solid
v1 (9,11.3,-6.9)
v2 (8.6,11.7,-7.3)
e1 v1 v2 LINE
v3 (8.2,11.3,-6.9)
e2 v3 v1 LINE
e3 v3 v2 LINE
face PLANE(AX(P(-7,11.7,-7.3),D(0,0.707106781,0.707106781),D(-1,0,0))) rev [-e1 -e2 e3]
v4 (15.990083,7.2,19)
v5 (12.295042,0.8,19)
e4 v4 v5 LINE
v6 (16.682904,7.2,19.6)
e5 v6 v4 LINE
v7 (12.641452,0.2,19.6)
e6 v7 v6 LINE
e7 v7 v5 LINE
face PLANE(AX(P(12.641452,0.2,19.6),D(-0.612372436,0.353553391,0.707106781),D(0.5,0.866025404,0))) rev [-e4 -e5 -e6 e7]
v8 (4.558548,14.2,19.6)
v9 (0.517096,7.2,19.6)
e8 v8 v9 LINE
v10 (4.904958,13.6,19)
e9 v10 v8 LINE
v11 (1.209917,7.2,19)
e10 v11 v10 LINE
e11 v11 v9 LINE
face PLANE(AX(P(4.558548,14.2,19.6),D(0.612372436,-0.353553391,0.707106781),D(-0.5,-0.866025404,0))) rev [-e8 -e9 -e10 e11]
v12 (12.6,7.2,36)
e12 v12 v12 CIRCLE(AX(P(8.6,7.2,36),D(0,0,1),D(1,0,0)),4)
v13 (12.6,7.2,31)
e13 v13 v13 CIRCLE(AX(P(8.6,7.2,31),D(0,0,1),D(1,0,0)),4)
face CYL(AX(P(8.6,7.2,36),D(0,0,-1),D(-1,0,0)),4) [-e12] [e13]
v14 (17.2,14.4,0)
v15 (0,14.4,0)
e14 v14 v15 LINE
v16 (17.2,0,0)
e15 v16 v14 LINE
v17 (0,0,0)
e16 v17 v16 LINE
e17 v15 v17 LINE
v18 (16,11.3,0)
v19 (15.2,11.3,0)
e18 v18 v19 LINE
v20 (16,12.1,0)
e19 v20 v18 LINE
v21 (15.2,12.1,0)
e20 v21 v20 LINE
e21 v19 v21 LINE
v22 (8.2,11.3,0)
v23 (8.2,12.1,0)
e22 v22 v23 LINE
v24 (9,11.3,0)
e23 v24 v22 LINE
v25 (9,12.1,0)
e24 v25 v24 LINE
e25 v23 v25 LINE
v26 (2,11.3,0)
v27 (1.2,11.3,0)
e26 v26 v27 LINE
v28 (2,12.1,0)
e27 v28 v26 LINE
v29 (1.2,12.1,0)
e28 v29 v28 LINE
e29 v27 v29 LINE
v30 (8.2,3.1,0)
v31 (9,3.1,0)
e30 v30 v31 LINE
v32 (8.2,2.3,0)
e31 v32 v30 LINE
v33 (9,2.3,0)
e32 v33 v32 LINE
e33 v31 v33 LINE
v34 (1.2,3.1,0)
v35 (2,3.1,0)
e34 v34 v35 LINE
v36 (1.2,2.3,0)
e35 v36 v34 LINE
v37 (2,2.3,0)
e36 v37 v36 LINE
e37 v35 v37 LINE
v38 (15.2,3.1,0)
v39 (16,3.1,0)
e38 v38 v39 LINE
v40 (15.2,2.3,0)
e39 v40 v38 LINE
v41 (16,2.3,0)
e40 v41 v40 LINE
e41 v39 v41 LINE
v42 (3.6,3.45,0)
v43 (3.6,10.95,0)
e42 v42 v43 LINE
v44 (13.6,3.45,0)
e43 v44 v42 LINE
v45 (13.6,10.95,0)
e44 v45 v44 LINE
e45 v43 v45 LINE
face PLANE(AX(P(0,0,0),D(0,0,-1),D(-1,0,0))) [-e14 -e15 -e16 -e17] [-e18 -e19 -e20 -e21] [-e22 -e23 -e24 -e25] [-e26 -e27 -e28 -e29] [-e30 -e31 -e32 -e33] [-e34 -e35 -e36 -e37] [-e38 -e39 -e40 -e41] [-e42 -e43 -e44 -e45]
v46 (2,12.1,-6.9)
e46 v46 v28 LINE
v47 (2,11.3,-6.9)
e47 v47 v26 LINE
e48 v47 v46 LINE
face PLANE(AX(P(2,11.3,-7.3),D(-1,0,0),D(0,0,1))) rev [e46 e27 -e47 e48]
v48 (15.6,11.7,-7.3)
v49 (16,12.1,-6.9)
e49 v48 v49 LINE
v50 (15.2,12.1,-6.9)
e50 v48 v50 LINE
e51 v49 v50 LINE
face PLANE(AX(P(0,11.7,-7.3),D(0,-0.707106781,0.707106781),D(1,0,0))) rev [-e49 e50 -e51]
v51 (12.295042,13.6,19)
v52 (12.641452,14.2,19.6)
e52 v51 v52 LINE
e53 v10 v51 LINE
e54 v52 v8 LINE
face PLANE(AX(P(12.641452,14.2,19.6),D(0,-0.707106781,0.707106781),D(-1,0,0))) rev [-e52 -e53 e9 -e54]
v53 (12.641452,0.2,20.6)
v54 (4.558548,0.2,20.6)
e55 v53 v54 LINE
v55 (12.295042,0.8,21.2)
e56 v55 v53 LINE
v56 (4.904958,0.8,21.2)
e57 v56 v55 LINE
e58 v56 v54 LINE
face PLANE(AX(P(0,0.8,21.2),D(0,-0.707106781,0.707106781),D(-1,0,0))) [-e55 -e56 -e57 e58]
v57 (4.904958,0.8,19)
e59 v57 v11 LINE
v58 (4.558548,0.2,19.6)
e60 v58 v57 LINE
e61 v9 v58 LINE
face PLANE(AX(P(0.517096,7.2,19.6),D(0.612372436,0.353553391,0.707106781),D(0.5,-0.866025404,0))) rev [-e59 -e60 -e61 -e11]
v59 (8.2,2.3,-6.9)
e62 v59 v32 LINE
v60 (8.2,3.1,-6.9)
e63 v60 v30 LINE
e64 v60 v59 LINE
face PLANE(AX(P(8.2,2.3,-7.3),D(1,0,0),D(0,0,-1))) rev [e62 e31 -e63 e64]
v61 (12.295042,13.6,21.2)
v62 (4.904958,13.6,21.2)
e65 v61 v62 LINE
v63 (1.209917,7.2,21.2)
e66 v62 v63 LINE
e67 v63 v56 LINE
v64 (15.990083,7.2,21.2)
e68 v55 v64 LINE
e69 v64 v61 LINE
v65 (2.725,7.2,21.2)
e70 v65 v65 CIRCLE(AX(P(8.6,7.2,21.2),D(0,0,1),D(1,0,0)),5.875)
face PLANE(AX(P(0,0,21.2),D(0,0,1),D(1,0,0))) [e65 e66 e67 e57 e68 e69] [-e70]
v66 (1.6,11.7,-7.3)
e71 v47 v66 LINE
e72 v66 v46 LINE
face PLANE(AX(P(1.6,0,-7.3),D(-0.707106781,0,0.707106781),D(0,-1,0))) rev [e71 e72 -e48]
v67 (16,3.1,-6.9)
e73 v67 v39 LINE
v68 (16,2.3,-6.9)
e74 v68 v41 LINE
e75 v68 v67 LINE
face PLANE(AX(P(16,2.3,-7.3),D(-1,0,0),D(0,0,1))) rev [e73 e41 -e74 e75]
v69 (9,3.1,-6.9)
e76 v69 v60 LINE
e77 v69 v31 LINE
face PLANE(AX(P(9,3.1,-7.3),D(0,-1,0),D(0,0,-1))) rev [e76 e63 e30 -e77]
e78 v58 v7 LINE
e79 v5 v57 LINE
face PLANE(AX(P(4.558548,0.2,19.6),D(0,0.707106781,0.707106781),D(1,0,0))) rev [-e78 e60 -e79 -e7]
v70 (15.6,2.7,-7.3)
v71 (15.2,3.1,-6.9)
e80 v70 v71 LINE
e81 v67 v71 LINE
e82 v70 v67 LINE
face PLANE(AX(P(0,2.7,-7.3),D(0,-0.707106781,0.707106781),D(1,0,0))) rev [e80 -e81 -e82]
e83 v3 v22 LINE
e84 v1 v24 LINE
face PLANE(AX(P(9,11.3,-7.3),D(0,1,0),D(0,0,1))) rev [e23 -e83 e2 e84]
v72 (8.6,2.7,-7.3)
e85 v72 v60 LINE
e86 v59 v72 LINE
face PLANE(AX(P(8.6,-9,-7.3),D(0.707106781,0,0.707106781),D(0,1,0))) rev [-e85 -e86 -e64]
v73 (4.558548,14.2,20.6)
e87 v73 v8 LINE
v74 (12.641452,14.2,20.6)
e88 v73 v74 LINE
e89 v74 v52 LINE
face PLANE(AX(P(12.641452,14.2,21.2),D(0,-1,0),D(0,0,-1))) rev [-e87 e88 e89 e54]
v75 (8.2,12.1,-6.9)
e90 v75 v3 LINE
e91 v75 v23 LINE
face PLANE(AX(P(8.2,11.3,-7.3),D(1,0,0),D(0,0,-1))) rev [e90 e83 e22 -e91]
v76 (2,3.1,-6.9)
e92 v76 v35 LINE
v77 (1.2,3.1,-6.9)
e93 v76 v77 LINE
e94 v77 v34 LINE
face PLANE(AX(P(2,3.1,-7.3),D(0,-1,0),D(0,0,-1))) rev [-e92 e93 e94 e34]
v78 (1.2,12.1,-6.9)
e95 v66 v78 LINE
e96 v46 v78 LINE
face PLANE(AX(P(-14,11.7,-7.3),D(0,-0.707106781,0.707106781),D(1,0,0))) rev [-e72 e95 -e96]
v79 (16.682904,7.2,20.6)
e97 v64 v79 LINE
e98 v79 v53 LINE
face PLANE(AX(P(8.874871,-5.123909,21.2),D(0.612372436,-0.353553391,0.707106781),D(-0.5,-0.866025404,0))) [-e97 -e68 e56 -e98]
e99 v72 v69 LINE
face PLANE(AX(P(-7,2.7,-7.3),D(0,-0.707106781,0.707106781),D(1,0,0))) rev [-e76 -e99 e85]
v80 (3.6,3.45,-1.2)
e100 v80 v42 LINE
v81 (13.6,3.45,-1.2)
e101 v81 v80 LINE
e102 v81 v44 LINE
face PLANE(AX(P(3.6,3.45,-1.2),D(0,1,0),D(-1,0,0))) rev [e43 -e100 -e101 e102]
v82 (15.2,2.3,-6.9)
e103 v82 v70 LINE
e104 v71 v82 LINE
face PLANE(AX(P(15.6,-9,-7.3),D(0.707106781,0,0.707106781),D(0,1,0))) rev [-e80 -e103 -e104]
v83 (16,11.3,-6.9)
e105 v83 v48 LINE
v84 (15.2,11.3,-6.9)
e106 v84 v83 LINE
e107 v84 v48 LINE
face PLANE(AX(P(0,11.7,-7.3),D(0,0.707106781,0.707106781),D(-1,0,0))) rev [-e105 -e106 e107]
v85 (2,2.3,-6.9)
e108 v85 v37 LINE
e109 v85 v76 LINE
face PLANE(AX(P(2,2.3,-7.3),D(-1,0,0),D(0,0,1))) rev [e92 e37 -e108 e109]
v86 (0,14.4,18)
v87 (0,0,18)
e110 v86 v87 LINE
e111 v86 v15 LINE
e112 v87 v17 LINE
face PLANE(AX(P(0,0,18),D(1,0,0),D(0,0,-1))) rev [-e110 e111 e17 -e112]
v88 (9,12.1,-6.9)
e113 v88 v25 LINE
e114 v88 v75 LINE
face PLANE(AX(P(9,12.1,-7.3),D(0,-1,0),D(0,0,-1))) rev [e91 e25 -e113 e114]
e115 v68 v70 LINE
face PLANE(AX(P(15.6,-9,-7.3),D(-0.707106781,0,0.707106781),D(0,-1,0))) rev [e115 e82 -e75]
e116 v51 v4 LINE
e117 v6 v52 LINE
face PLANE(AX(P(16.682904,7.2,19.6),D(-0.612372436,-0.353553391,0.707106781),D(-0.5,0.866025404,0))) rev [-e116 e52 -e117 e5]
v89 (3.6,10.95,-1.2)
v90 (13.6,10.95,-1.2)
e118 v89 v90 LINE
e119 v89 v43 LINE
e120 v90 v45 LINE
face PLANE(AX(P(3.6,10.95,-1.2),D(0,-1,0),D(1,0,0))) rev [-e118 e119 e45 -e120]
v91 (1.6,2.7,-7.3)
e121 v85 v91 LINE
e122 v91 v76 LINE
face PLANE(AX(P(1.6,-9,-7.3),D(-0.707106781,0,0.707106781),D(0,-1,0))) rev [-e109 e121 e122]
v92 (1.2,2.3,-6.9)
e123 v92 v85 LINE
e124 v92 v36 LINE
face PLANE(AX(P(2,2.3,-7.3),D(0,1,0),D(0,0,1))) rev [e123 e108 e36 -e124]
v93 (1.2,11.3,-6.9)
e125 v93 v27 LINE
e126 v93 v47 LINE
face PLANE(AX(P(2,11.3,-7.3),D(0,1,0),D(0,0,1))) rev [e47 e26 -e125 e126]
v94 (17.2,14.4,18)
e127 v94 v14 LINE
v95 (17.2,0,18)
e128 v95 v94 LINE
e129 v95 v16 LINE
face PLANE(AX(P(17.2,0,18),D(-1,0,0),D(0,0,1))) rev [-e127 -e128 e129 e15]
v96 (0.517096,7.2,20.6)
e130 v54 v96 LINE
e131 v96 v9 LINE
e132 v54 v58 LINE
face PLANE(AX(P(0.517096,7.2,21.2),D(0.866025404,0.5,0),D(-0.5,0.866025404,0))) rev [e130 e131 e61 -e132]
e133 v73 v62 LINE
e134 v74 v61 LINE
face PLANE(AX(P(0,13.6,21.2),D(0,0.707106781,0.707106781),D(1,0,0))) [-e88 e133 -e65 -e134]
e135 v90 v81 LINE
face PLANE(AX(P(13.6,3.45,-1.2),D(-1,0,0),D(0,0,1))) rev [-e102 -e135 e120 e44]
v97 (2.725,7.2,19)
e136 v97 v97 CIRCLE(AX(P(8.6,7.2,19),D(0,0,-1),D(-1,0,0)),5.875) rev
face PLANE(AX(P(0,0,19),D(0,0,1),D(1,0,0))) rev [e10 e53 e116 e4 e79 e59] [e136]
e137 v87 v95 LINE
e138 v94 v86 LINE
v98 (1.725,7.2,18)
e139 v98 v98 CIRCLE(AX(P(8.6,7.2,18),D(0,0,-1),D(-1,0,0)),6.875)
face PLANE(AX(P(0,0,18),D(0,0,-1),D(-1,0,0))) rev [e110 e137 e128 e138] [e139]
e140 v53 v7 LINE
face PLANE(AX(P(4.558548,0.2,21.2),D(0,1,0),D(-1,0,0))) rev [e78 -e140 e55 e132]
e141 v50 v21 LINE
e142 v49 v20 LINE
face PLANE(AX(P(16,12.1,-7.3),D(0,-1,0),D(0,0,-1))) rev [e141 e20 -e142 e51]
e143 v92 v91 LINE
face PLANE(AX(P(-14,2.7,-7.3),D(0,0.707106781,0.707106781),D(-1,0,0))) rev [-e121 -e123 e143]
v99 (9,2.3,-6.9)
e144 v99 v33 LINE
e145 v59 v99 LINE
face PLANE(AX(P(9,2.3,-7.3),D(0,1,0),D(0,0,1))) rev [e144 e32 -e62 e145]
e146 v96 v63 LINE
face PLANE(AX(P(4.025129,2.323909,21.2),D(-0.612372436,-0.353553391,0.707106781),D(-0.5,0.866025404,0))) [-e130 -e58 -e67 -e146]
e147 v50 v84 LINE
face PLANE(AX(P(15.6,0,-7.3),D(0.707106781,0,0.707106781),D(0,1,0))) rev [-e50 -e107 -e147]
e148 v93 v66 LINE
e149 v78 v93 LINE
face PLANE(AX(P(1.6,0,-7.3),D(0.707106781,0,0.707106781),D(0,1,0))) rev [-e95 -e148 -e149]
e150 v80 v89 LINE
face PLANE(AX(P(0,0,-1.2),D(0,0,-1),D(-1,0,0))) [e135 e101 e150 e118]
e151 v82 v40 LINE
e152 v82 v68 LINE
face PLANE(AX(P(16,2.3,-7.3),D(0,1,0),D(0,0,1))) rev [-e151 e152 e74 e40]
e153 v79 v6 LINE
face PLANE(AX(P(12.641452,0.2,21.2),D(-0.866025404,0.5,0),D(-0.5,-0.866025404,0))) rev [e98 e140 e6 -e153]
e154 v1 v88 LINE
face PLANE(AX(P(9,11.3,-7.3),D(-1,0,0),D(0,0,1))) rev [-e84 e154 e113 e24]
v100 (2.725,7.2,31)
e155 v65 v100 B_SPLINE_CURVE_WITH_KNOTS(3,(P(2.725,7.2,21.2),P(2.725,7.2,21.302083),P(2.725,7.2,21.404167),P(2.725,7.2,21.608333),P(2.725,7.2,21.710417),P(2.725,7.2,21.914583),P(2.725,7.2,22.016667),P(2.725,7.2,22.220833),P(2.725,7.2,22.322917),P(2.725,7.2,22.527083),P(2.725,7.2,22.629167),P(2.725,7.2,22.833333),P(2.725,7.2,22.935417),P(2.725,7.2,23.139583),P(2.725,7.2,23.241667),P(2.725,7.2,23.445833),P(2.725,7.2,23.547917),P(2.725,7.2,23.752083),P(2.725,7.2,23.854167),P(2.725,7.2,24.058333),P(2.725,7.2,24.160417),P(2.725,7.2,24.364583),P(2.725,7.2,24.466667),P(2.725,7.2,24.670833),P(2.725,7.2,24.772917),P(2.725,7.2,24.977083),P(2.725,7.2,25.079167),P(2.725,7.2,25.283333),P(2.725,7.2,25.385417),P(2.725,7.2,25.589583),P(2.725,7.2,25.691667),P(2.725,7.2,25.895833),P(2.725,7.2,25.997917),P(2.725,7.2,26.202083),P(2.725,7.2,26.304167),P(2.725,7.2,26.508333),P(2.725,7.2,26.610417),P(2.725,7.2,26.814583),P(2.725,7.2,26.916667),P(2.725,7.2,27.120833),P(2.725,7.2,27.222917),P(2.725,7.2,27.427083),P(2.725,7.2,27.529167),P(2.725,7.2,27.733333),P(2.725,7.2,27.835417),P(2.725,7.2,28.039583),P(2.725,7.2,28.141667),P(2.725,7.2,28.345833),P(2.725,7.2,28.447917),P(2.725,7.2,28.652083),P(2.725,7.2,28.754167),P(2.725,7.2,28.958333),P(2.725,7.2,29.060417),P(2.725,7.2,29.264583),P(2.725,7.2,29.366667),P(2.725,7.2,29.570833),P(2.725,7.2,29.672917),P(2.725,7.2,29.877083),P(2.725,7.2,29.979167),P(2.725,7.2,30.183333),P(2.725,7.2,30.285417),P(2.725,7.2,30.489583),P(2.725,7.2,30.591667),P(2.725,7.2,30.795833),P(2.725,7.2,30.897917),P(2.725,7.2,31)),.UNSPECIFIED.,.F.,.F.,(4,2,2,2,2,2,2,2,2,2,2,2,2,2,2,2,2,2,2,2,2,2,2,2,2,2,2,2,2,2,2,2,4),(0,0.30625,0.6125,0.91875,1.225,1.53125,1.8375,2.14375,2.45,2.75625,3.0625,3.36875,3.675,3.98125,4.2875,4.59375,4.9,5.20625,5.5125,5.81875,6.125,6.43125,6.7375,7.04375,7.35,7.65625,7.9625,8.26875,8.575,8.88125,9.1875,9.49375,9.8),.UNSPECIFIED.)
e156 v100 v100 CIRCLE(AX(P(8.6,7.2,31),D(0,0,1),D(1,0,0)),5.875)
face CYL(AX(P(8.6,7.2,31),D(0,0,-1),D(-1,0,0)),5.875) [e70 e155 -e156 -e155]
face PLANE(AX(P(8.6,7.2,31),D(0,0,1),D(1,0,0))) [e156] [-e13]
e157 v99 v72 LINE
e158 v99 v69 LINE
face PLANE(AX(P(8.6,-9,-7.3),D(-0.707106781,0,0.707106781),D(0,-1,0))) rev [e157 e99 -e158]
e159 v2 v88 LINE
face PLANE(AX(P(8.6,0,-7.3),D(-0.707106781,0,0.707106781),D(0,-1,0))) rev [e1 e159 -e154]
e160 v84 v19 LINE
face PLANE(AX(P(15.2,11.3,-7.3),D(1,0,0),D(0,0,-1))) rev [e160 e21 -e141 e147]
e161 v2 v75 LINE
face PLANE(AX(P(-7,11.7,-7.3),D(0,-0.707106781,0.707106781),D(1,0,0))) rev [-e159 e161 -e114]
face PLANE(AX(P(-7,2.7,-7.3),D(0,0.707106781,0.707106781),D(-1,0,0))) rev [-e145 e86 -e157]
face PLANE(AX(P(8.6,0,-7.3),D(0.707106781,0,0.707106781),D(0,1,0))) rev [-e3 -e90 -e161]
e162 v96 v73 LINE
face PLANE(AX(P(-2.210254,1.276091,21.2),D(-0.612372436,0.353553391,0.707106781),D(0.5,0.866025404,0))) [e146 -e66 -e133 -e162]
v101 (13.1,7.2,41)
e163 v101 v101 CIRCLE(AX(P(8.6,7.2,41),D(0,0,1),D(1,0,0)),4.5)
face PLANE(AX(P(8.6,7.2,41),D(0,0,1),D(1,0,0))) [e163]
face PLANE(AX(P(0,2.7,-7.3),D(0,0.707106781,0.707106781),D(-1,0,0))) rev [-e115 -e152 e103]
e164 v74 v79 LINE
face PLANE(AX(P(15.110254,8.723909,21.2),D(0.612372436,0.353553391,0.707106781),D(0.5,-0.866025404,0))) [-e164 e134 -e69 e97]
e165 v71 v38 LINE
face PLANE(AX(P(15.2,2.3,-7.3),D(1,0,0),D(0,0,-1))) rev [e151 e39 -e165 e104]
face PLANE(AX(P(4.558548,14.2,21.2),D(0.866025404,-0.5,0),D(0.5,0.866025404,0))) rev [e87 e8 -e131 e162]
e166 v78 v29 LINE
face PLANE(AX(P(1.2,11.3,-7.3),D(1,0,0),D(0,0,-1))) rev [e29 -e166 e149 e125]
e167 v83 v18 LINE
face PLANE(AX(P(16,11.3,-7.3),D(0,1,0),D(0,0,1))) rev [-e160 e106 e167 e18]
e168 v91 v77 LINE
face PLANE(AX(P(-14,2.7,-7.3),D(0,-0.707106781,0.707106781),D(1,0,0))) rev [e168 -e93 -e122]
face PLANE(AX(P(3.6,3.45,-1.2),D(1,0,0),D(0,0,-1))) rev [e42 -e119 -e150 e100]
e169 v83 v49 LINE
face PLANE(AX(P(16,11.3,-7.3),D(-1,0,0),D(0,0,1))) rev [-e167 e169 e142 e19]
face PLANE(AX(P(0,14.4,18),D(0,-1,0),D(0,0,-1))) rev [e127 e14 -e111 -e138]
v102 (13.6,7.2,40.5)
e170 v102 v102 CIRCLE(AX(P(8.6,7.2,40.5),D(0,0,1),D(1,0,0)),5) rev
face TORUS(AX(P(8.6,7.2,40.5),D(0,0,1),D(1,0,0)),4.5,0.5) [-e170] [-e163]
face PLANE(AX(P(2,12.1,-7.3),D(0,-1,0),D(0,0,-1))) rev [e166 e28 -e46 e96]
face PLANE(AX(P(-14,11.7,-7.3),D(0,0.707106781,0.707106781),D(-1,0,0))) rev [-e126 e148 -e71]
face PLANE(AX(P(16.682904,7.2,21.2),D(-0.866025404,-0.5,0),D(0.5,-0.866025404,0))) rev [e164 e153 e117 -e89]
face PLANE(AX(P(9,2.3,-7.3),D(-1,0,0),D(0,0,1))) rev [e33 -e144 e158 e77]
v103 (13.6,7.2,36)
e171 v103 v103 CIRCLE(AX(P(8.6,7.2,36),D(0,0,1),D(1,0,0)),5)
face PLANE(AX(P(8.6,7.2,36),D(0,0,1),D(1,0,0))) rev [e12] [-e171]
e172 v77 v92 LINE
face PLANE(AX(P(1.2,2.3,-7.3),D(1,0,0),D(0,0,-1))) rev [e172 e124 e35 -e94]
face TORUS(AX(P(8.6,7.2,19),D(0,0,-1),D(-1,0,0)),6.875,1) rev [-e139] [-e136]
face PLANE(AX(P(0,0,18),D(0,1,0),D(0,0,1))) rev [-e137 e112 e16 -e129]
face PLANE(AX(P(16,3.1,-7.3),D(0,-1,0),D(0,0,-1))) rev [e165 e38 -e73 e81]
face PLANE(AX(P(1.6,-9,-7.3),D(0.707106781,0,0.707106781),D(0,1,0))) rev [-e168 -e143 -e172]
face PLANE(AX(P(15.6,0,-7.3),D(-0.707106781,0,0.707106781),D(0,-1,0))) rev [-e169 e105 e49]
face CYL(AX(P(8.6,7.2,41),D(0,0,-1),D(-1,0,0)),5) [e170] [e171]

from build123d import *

# Parameters (mm, degrees)
SKETCH1_W                  = 17.2
SKETCH1_H                  = 14.4
BOSS_EXTRUDE1_DEPTH        = 18
SKETCH2_R                  = 5.875
BOSS_EXTRUDE2_DEPTH        = 13
SKETCH3_R                  = 4
BOSS_EXTRUDE3_DEPTH        = 5
SKETCH4_R                  = 5
BOSS_EXTRUDE4_DEPTH        = 5
SKETCH5_W                  = 10
SKETCH5_H                  = 7.5
BOSS_EXTRUDE5_DEPTH        = 1.2
SKETCH6_W                  = 0.8
SKETCH6_H                  = 0.8
BOSS_EXTRUDE6_DEPTH        = 7.3
CHAMFER1_SIZE              = 0.4
FILLET1_R                  = 1
FILLET2_R                  = 0.5
SKETCH7_R                  = 5.875
BOSS_EXTRUDE7_DEPTH        = 2.2
CHAMFER2_SIZE              = 0.6
LPATTERN1_COUNT            = 3
LPATTERN1_PITCH            = 7
LPATTERN1_COUNT_DIR2       = 2
LPATTERN1_PITCH_DIR2       = 9
CHAMFER1_OF_LPATTERN1_SIZE = 0.4


with BuildPart() as part:
    # Sketch1 → Boss-Extrude1 (new body)
    with BuildSketch(Plane.XY):
        with Locations((8.6, 7.2)):
            Rectangle(SKETCH1_W, SKETCH1_H)
    extrude(amount=BOSS_EXTRUDE1_DEPTH)

    # Sketch2 → Boss-Extrude2 (add)
    with BuildSketch(Plane.XY.offset(18)):
        with Locations(Location((8.6, 7.2, 0), (0, 0, 180))):
            Circle(SKETCH2_R)
    extrude(amount=BOSS_EXTRUDE2_DEPTH)

    # Sketch3 → Boss-Extrude3 (add)
    with BuildSketch(Plane.XY.offset(31)):
        with Locations((8.6, 7.2)):
            Circle(SKETCH3_R)
    extrude(amount=BOSS_EXTRUDE3_DEPTH)

    # Sketch4 → Boss-Extrude4 (add)
    with BuildSketch(Plane.XY.offset(36)):
        with Locations((8.6, 7.2)):
            Circle(SKETCH4_R)
    extrude(amount=BOSS_EXTRUDE4_DEPTH)

    # Sketch5 → Boss-Extrude5 (add)
    with BuildSketch(Plane(origin=(0, 0, 0), x_dir=(-1, 0, 0), z_dir=(0, 0, -1))):
        with Locations((-8.6, 7.2)):
            Rectangle(SKETCH5_W, SKETCH5_H)
    extrude(amount=BOSS_EXTRUDE5_DEPTH)

    # Sketch6 → Boss-Extrude6 (add)
    with BuildSketch(Plane(origin=(0, 0, 0), x_dir=(-1, 0, 0), z_dir=(0, 0, -1))):
        with Locations((-15.6, 11.7)):
            Rectangle(SKETCH6_W, SKETCH6_H)
    boss_extrude6 = extrude(amount=BOSS_EXTRUDE6_DEPTH)

    # Chamfer1
    chamfer1_edges = [part.edges().sort_by_distance(p)[0] for p in [
        (15.2, 11.7, -7.3),
        (15.6, 12.1, -7.3),
        (16, 11.7, -7.3),
        (15.6, 11.3, -7.3),
    ]]
    chamfer(chamfer1_edges, length=CHAMFER1_SIZE - 0.0001)  # a hair under: the kernel refuses the full size

    # Fillet1
    fillet1_edges = [part.edges().sort_by_distance(p)[0] for p in [
        (14.475, 7.2, 18),
    ]]
    fillet(fillet1_edges, radius=FILLET1_R)

    # Fillet2
    fillet2_edges = [part.edges().sort_by_distance(p)[0] for p in [
        (3.6, 7.2, 41),
    ]]
    fillet(fillet2_edges, radius=FILLET2_R)

    # Sketch7 → Boss-Extrude7 (add)
    with BuildSketch(Plane.XY.offset(19)):
        Polygon((16.682903769, 7.2), (12.641451884, 14.2), (4.558548116, 14.2), (0.517096231, 7.2), (4.558548116, 0.2), (12.641451884, 0.2), align=None)
        with Locations(Location((8.6, 7.2, 0), (0, 0, 180))):
            Circle(SKETCH7_R, mode=Mode.SUBTRACT)
    extrude(amount=BOSS_EXTRUDE7_DEPTH)

    # Chamfer2
    chamfer2_edges = [part.edges().sort_by_distance(p)[0] for p in [
        (14.662177826, 3.7, 21.2),
        (14.662177826, 10.7, 21.2),
        (8.6, 14.2, 21.2),
        (2.537822174, 10.7, 21.2),
        (2.537822174, 3.7, 21.2),
        (8.6, 0.2, 21.2),
        (14.662177826, 3.7, 19),
        (14.662177826, 10.7, 19),
        (8.6, 14.2, 19),
        (2.537822174, 10.7, 19),
        (2.537822174, 3.7, 19),
        (8.6, 0.2, 19),
    ]]
    chamfer(chamfer2_edges, length=CHAMFER2_SIZE)

    # LPattern1: Boss-Extrude6 3 × 2
    with Locations(*[(-i * LPATTERN1_PITCH, -j * LPATTERN1_PITCH_DIR2, 0) for i in range(LPATTERN1_COUNT) for j in range(LPATTERN1_COUNT_DIR2) if (i, j) != (0, 0)]):
        add(boss_extrude6)

    # Chamfer1 of LPattern1
    chamfer1_of_lpattern1_edges = [part.edges().sort_by_distance(p)[0] for p in [
        (15.2, 2.7, -7.3),
        (15.6, 3.1, -7.3),
        (16, 2.7, -7.3),
        (15.6, 2.3, -7.3),
        (8.2, 11.7, -7.3),
        (8.6, 12.1, -7.3),
        (9, 11.7, -7.3),
        (8.6, 11.3, -7.3),
        (8.2, 2.7, -7.3),
        (8.6, 3.1, -7.3),
        (9, 2.7, -7.3),
        (8.6, 2.3, -7.3),
        (1.2, 11.7, -7.3),
        (1.6, 12.1, -7.3),
        (2, 11.7, -7.3),
        (1.6, 11.3, -7.3),
        (1.2, 2.7, -7.3),
        (1.6, 3.1, -7.3),
        (2, 2.7, -7.3),
        (1.6, 2.3, -7.3),
    ]]
    chamfer(chamfer1_of_lpattern1_edges, length=CHAMFER1_OF_LPATTERN1_SIZE - 0.0001)  # a hair under: the kernel refuses the full size


solid = part.part
